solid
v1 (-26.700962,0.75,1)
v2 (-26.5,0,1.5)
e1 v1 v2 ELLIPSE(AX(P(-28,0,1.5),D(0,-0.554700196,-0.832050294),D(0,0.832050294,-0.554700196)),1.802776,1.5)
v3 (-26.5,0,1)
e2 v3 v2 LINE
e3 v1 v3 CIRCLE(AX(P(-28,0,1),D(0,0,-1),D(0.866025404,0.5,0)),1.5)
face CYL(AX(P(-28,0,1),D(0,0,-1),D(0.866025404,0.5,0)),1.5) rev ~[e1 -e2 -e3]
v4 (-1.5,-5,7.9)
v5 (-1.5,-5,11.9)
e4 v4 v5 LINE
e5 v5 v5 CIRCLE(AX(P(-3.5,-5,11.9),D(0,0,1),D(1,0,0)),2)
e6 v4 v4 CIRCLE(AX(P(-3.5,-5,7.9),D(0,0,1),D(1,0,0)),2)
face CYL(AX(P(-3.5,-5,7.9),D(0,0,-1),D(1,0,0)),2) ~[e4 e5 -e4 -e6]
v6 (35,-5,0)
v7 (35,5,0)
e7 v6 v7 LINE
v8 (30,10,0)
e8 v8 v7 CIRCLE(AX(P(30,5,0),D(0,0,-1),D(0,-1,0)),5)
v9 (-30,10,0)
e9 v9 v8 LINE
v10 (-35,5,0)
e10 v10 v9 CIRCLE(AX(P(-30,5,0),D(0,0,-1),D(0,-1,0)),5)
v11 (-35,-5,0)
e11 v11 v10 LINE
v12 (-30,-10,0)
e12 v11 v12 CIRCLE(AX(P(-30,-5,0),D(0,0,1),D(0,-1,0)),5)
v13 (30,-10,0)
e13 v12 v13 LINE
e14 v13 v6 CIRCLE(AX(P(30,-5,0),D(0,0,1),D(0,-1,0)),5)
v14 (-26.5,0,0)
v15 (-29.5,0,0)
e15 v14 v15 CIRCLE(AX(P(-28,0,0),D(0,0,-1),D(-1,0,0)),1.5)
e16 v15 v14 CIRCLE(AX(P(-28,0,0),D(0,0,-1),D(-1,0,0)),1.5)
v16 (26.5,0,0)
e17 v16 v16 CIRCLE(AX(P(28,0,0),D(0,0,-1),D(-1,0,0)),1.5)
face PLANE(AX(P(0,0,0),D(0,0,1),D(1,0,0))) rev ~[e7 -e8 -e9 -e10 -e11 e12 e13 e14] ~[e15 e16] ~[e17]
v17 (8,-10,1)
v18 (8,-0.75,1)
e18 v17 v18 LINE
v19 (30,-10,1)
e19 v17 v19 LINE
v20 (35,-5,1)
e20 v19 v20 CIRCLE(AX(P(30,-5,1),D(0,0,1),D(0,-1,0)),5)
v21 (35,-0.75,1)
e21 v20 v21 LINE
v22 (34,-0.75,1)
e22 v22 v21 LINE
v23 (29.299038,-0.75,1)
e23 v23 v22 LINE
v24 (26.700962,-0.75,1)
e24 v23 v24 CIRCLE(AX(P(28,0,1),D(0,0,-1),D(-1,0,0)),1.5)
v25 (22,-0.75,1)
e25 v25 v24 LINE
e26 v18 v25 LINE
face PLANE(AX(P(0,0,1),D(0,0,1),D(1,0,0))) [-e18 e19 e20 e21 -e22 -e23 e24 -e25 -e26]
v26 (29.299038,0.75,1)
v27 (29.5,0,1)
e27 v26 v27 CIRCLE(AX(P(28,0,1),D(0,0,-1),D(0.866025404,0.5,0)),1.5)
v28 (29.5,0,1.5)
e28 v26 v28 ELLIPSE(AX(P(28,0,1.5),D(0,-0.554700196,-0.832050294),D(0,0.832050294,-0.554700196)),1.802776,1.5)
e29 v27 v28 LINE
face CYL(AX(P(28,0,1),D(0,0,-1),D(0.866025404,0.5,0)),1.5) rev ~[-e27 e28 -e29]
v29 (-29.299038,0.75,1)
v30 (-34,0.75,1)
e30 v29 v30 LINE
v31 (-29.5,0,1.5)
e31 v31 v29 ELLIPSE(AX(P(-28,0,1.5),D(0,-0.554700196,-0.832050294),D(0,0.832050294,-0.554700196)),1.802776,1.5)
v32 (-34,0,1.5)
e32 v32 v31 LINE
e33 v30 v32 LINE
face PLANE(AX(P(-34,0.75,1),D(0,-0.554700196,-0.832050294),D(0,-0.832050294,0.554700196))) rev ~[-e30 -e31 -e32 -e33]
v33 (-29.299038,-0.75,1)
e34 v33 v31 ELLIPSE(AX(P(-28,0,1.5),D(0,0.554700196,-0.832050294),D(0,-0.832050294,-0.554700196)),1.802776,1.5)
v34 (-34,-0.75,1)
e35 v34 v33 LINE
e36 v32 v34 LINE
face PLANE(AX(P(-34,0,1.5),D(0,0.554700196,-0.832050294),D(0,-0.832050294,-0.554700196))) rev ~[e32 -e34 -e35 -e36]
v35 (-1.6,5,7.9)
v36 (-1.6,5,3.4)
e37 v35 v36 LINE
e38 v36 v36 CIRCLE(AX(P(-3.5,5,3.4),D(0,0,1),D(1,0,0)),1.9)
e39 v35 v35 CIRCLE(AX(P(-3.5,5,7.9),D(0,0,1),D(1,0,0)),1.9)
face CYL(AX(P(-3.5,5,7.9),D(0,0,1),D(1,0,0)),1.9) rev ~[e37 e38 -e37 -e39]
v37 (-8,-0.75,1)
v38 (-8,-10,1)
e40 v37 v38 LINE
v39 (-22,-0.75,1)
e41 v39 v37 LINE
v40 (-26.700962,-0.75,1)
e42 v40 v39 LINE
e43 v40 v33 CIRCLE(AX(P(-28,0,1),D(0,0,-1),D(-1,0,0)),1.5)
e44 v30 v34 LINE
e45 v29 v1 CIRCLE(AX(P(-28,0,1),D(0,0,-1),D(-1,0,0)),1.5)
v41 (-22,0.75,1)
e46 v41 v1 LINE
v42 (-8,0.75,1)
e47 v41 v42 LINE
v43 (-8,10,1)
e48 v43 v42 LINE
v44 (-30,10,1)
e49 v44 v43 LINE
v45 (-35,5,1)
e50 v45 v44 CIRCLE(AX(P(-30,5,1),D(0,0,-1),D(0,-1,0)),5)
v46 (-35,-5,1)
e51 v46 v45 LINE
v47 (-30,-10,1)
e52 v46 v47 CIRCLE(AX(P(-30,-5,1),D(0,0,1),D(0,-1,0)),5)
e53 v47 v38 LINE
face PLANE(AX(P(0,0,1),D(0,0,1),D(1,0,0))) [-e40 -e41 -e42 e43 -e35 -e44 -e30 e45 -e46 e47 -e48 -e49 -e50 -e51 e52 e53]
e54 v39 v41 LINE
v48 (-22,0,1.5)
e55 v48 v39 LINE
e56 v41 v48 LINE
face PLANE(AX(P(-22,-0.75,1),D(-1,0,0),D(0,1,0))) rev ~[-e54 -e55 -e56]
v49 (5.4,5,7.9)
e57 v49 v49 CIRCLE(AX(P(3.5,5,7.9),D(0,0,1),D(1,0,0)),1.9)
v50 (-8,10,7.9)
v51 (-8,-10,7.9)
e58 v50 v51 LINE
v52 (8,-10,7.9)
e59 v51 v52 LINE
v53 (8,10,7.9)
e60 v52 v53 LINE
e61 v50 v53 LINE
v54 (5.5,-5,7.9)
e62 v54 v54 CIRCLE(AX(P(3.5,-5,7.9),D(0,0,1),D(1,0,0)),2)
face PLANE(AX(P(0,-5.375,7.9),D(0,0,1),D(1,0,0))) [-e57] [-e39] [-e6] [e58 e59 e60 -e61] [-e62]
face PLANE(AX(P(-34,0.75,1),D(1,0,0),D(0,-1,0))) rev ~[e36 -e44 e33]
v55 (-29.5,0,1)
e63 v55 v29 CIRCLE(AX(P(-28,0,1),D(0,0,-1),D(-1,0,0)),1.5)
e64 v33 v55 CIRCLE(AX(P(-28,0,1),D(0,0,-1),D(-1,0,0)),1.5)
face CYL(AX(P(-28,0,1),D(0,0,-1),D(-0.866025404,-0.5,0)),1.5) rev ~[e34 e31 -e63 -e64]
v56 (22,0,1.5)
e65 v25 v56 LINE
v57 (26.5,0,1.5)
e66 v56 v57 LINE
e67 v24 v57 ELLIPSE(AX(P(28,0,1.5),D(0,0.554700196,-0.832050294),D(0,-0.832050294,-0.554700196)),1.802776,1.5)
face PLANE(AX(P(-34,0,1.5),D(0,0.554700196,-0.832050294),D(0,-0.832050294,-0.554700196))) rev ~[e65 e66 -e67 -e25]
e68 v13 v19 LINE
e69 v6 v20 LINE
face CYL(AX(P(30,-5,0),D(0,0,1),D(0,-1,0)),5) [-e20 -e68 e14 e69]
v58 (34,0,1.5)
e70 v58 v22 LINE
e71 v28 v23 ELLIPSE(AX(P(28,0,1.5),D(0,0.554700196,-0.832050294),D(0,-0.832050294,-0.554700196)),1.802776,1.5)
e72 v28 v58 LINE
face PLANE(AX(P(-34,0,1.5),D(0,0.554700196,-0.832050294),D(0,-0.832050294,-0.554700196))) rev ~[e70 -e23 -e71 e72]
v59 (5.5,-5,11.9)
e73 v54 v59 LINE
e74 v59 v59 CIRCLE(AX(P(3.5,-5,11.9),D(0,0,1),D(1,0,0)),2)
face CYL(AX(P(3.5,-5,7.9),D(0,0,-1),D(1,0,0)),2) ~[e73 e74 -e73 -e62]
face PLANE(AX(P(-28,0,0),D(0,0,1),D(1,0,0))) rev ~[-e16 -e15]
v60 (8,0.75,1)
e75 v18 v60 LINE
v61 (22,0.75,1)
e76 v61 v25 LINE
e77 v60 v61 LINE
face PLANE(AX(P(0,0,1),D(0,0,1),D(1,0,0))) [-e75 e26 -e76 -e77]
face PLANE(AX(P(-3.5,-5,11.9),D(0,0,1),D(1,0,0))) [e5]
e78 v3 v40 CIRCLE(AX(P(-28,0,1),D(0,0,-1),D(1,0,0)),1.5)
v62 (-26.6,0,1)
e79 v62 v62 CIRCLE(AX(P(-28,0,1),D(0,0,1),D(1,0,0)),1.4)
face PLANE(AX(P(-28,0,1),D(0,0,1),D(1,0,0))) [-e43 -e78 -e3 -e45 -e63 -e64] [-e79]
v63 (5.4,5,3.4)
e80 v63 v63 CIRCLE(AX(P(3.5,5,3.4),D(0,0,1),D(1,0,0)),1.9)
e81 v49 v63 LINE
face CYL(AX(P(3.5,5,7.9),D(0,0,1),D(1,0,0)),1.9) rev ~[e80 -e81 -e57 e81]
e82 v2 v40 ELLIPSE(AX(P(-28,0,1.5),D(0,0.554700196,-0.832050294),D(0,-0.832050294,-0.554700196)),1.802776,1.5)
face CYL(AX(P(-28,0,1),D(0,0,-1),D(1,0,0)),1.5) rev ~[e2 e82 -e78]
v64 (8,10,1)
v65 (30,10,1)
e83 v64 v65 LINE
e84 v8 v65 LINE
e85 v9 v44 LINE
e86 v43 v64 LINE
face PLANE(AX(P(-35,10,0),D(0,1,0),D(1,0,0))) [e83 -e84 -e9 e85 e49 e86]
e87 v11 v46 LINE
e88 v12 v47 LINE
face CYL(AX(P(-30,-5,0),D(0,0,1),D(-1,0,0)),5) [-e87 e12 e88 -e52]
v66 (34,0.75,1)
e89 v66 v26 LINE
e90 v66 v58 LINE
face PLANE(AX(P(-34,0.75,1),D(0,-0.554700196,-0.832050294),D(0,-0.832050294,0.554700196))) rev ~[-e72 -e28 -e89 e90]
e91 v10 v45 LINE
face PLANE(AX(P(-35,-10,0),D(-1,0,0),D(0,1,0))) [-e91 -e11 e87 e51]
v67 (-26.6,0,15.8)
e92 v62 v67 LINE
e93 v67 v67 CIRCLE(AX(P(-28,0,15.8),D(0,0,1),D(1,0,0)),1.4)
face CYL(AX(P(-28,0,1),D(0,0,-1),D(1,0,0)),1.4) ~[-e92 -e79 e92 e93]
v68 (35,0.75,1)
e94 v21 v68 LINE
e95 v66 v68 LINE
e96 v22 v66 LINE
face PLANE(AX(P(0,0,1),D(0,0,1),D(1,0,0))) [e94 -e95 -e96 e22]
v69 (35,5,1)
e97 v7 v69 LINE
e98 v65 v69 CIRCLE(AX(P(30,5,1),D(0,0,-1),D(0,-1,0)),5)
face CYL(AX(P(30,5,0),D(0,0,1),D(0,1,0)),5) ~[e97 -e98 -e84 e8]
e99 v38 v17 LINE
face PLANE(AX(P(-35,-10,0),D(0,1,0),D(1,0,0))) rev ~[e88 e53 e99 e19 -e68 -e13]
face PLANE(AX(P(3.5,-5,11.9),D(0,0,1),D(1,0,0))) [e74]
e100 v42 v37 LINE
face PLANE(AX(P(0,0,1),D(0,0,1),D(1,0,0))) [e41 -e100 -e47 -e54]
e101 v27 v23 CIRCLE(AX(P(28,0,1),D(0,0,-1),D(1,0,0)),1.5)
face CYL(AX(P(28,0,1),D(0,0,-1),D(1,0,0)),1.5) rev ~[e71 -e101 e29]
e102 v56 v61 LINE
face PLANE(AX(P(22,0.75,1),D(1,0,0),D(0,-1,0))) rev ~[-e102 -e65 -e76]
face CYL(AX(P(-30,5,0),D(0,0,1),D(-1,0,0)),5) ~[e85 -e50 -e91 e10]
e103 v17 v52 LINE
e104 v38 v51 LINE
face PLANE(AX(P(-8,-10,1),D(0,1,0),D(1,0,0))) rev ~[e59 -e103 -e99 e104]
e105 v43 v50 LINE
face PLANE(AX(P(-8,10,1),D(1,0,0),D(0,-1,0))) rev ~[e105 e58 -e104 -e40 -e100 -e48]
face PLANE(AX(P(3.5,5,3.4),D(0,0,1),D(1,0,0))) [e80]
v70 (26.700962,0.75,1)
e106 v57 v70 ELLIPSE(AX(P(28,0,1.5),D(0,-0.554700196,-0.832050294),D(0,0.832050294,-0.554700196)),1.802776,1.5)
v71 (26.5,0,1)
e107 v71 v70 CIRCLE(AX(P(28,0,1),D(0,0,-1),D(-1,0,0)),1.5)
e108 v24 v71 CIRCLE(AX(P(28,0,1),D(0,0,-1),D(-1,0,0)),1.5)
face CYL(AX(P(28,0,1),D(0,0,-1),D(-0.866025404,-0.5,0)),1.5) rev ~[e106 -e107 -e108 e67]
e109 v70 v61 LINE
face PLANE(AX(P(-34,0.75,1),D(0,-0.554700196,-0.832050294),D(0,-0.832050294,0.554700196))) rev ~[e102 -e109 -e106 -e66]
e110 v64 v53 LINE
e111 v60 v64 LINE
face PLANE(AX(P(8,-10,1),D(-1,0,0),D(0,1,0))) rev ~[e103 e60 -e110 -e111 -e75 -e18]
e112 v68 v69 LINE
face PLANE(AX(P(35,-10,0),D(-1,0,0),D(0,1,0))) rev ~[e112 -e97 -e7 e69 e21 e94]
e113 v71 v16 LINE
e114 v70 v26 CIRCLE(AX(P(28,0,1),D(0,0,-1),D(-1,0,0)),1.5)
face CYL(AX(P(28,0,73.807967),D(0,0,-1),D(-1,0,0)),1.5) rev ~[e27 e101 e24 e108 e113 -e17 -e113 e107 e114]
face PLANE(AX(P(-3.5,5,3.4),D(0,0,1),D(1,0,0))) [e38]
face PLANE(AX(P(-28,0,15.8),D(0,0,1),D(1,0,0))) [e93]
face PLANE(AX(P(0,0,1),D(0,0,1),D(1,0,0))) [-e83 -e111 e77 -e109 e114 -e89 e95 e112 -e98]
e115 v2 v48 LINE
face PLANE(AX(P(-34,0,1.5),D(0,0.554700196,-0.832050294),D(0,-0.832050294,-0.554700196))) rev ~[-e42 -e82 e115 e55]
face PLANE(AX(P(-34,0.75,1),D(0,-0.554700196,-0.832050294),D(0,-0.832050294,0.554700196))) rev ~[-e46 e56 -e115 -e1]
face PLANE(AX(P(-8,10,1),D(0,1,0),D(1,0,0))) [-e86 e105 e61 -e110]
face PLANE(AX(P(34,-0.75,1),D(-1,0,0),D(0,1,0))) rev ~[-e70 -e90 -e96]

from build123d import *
from build123d import SkipClean  # not in build123d's __all__

# Parameters (mm, degrees)
F0_W      = 70
F0_H      = 20
F1_DEPTH  = 1
F3_D      = 3
F4_R      = 5
F7_DEPTH  = 0.5
F9_DEPTH  = 69.001
F10_W     = 16
F10_H     = 9.25
F10_H_2   = 1.5
F11_DEPTH = 6.9
F12_R     = 1.9
F13_DEPTH = 4.5
F14_R     = 2
F15_DEPTH = 4
F16_R     = 1.5
F17_DEPTH = 1
F18_R     = 1.4
F19_DEPTH = 14.8


with BuildPart() as f1:
    # F0 (on Top) → F1 (new body)
    with BuildSketch(Plane.XY):
        Rectangle(F0_W, F0_H)
    extrude(amount=F1_DEPTH)

    # F3 (through all)
    with Locations(Plane.XY.offset(1)):
        with Locations((-28, 0), (28, 0)):
            Hole(F3_D / 2)

    # F4
    f4_edges = [f1.edges().sort_by_distance(p)[0] for p in [
        (-35, 10, 0.5),
        (-35, -10, 0.5),
        (35, 10, 0.5),
        (35, -10, 0.5),
    ]]
    fillet(f4_edges, radius=F4_R)

    # F5 (on face) + F6 (on face) → F7 (join)
    with BuildSketch(Plane.XY.offset(1)):
        with BuildLine():
            Line((-29.2990381057, 0.75), (-34, 0.75))
            Line((-34, 0.75), (-34, -0.75))
            Line((-34, -0.75), (-29.2990381057, -0.75))
            ThreePointArc((-29.2990381057, -0.75), (-29.5, 0), (-29.2990381057, 0.75))
        make_face()
        with BuildLine():
            Line((-22, 0.75), (-26.7009618943, 0.75))
            ThreePointArc((-26.7009618943, 0.75), (-26.5511112606, 0.3882285677), (-26.5, 0))
            ThreePointArc((-26.5, 0), (-26.5511112606, -0.3882285677), (-26.7009618943, -0.75))
            Line((-26.7009618943, -0.75), (-22, -0.75))
            Line((-22, -0.75), (-22, 0.75))
        make_face()
    with BuildSketch(Plane.XY.offset(1)):
        with BuildLine():
            Line((26.7009618943, 0.75), (22, 0.75))
            Line((22, 0.75), (22, -0.75))
            Line((22, -0.75), (26.7009618943, -0.75))
            ThreePointArc((26.7009618943, -0.75), (26.5, 0), (26.7009618943, 0.75))
        make_face()
        with BuildLine():
            Line((34, 0.75), (29.2990381057, 0.75))
            ThreePointArc((29.2990381057, 0.75), (29.4488887394, 0.3882285677), (29.5, 0))
            ThreePointArc((29.5, 0), (29.4488887394, -0.3882285677), (29.2990381057, -0.75))
            Line((29.2990381057, -0.75), (34, -0.75))
            Line((34, -0.75), (34, 0.75))
        make_face()
    with SkipClean():  # cleaning this boolean's faces spoils the solid; the shape is the same uncleaned
        extrude(amount=F7_DEPTH)

    # F8 (on face) → F9 (cut, through all)
    with BuildSketch(Plane(origin=(-34, 0, 0), x_dir=(0, -1, 0), z_dir=(-1, 0, 0))):
        Polygon((-0.75, 1.5), (-0.75, 1), (0, 1.5), align=None)
        Polygon((0.75, 1.5), (0, 1.5), (0.75, 1), align=None)
    with SkipClean():  # cleaning this boolean's faces spoils the solid; the shape is the same uncleaned
        extrude(amount=-F9_DEPTH, mode=Mode.SUBTRACT)

    # F10 (on face) → F11 (join)
    with BuildSketch(Plane.XY.offset(1)):
        with Locations((0, -5.375)):
            Rectangle(F10_W, F10_H)
        Rectangle(F10_W, F10_H_2)
        with Locations((0, 5.375)):
            Rectangle(F10_W, F10_H)
    with SkipClean():  # cleaning this boolean's faces spoils the solid; the shape is the same uncleaned
        extrude(amount=F11_DEPTH)

    # F12 (on face) → F13 (cut)
    with BuildSketch(Plane.XY.offset(7.9)):
        with Locations((-3.5, 5)):
            Circle(F12_R)
        with Locations((3.5, 5)):
            Circle(F12_R)
    with SkipClean():  # cleaning this boolean's faces spoils the solid; the shape is the same uncleaned
        extrude(amount=-F13_DEPTH, mode=Mode.SUBTRACT)

    # F14 (on face) → F15 (join)
    with BuildSketch(Plane.XY.offset(7.9)):
        with Locations((-3.5, -5)):
            Circle(F14_R)
        with Locations((3.5, -5)):
            Circle(F14_R)
    with SkipClean():  # cleaning this boolean's faces spoils the solid; the shape is the same uncleaned
        extrude(amount=F15_DEPTH)

    # F16 (on face) → F17 (join)
    with BuildSketch(Plane.XY.offset(1)):
        with Locations((-28, 0)):
            Circle(F16_R)
    with SkipClean():  # cleaning this boolean's faces spoils the solid; the shape is the same uncleaned
        extrude(amount=-F17_DEPTH)

    # F18 (on face) → F19 (join)
    with BuildSketch(Plane.XY.offset(1)):
        with Locations((-28, 0)):
            Circle(F18_R)
    with SkipClean():  # cleaning this boolean's faces spoils the solid; the shape is the same uncleaned
        extrude(amount=F19_DEPTH)


solid = f1.part
